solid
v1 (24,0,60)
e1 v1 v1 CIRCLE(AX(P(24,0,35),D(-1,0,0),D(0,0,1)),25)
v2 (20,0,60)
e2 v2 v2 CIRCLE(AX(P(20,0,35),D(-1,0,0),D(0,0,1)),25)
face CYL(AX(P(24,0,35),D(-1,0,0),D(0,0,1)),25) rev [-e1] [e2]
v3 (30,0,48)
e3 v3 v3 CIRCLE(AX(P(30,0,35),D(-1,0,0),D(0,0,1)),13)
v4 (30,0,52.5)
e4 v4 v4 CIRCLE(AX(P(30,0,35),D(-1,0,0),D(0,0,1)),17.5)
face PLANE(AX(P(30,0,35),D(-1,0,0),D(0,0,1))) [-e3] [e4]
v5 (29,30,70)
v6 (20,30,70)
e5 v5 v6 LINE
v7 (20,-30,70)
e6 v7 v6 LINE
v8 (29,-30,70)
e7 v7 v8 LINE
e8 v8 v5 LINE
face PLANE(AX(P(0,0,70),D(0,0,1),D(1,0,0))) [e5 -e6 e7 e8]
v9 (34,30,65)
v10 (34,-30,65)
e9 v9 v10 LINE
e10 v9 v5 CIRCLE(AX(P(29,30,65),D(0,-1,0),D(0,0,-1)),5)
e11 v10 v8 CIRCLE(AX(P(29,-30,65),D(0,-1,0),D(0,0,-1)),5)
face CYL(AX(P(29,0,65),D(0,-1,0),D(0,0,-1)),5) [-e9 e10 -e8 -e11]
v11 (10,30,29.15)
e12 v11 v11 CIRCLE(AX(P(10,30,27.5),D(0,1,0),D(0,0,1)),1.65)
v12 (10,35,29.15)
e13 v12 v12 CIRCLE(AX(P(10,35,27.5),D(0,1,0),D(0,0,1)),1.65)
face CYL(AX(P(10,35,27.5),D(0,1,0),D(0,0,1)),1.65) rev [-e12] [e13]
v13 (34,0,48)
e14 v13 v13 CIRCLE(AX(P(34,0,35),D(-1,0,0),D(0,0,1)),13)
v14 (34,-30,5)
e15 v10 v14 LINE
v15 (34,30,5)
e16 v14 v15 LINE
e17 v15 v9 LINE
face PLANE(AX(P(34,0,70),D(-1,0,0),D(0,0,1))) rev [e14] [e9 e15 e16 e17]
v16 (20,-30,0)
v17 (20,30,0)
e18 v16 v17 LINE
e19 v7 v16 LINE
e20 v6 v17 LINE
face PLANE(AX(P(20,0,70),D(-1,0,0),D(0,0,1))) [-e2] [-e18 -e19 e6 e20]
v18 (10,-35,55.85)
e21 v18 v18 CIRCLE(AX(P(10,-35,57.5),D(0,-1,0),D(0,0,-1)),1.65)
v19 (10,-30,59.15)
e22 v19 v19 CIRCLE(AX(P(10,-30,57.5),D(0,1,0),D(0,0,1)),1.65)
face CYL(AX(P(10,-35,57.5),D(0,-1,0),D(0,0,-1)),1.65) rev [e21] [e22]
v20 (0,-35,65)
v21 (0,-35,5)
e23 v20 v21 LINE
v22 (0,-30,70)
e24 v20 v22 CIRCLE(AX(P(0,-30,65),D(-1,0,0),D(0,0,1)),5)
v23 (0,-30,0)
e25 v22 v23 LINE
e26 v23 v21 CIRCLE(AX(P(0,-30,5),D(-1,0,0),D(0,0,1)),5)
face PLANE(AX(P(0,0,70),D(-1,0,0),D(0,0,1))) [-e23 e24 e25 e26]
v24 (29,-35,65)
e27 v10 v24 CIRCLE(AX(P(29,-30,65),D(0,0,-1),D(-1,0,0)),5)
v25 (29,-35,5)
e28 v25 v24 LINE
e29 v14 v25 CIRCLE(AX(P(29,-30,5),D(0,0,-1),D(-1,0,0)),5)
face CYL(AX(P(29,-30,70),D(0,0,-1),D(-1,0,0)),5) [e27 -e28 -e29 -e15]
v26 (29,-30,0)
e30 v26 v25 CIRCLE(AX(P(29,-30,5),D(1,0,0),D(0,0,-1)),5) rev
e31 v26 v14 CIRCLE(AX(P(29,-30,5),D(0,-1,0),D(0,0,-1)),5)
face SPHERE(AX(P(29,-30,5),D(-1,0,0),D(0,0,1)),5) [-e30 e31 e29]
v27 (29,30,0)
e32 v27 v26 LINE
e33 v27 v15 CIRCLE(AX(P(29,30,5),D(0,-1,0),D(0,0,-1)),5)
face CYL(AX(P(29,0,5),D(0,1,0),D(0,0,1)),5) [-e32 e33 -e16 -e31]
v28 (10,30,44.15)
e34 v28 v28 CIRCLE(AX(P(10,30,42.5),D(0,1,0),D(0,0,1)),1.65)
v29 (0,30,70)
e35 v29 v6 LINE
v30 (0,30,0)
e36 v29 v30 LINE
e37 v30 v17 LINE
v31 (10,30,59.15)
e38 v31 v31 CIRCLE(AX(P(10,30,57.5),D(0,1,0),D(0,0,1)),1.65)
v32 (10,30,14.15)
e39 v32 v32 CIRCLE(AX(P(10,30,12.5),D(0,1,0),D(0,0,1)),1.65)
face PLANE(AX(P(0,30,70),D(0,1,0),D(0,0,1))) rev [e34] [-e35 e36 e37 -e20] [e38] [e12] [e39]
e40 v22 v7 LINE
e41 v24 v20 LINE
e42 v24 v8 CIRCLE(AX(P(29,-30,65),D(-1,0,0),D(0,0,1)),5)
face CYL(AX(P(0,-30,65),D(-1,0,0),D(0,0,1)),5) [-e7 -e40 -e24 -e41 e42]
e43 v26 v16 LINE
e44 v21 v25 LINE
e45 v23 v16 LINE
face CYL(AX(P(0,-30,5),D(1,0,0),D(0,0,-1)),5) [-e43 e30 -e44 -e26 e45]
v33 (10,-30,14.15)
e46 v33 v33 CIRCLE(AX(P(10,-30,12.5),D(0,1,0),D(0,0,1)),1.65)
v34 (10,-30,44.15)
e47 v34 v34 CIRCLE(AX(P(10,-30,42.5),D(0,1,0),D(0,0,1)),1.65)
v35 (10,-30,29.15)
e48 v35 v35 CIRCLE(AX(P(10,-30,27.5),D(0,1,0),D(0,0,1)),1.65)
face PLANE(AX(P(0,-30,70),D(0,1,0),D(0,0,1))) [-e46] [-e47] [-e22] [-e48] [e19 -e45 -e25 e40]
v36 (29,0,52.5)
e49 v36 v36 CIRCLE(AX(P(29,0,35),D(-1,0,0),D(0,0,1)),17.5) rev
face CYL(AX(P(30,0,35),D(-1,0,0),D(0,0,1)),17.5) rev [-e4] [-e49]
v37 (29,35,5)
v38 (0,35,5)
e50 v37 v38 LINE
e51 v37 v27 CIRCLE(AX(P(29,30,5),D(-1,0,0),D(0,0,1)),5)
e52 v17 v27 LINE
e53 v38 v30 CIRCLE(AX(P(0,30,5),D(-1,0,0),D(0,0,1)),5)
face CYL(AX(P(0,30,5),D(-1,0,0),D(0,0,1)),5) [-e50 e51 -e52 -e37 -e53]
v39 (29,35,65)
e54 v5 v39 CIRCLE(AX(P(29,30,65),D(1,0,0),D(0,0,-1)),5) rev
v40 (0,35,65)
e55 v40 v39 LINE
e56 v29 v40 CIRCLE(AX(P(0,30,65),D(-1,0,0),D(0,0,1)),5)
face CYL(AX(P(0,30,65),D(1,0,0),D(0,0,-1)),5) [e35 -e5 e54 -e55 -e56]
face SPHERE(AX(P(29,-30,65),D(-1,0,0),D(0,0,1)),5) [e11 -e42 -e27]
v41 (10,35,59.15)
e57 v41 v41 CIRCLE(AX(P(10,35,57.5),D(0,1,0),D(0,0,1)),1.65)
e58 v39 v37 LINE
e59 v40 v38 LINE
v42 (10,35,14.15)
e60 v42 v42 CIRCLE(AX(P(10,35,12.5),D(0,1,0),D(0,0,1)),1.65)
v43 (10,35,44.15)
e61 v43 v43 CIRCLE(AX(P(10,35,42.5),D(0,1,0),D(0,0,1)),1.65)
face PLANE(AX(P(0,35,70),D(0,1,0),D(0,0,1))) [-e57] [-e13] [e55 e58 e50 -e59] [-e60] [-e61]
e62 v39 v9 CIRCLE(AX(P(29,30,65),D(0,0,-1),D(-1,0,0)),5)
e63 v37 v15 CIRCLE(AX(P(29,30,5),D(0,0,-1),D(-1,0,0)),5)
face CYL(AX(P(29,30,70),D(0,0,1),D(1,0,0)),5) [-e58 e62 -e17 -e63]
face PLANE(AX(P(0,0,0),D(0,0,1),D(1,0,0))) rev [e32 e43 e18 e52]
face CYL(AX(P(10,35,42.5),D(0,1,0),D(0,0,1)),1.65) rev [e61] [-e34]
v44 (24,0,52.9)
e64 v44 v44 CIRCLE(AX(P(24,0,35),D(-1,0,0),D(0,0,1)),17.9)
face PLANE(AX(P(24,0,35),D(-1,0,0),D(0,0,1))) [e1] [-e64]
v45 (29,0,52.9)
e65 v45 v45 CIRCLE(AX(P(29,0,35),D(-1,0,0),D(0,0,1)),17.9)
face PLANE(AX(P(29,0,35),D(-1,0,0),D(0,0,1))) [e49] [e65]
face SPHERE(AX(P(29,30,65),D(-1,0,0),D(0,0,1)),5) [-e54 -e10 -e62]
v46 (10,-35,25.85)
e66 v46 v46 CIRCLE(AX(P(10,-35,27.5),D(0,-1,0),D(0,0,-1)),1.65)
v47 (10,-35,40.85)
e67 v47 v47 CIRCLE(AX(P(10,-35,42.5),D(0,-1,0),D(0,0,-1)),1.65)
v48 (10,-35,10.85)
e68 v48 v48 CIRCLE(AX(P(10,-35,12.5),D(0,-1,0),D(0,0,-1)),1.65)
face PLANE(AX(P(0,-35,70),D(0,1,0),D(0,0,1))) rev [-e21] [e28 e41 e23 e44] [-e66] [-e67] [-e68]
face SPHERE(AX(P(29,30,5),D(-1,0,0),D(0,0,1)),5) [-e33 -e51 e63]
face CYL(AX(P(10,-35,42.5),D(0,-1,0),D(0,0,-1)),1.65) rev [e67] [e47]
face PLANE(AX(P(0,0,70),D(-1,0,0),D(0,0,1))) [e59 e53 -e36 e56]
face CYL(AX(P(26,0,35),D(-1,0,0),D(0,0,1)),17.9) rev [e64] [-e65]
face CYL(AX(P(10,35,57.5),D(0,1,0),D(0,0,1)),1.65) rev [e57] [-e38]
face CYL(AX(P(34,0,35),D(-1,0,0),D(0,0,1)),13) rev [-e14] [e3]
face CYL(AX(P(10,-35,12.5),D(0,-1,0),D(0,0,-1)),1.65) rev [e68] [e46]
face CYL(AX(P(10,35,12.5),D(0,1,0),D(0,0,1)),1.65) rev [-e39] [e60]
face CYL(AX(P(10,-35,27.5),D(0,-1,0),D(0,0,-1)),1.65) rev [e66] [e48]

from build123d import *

# Parameters (mm, degrees)
BOSS_EXTRUDE1_DEPTH       = 70
FILLET1_R                 = 5
FILLET2_R                 = 5
M4X0_7_TAPPED_HOLE1_D     = 3.3
M4X0_7_TAPPED_HOLE1_DEPTH = 5
SKETCH13_R                = 25
CUT_EXTRUDE1_DEPTH        = 4
SKETCH14_R                = 17.9
CUT_EXTRUDE2_DEPTH        = 2
SKETCH15_R                = 17.5
CUT_EXTRUDE3_DEPTH        = 4
SKETCH16_R                = 13
CUT_EXTRUDE4_DEPTH        = 84.815273071
SKETCH17_R                = 17.9
CUT_EXTRUDE5_DEPTH        = 3


with BuildPart() as part:
    # Sketch1 → Boss-Extrude1 (new body)
    with BuildSketch(Plane.XY):
        Polygon((0, -30), (0, -35), (34, -35), (34, 35), (0, 35), (0, 30), (20, 30), (20, -30), align=None)
    extrude(amount=BOSS_EXTRUDE1_DEPTH)

    # Fillet1
    fillet1_edges = [part.edges().sort_by_distance(p)[0] for p in [
        (17, -35, 70),
        (17, -35, 0),
        (17, 35, 0),
        (17, 35, 70),
    ]]
    fillet(fillet1_edges, radius=FILLET1_R - 0.0001)  # a hair under: the kernel refuses the full size

    # Fillet2
    fillet2_edges = [part.edges().sort_by_distance(p)[0] for p in [
        (34, 0, 70),
        (34, 0, 0),
        (34, 35, 35),
        (34, -35, 35),
        (34, 33.535563195, 68.535563195),
        (34, 33.535563195, 1.464436805),
        (34, -33.535563195, 1.464436805),
        (34, -33.535563195, 68.535563195),
    ]]
    fillet(fillet2_edges, radius=FILLET2_R - 0.0001)  # a hair under: the kernel refuses the full size

    # M4x0.7 Tapped Hole1
    with Locations(Plane(origin=(0, 35, 0), x_dir=(1, 0, 0), z_dir=(0, 1, 0))):
        with Locations((10, -12.5), (10, -27.5), (10, -42.5), (10, -57.5)):
            m4x0_7_tapped_hole1 = Hole(M4X0_7_TAPPED_HOLE1_D / 2, depth=M4X0_7_TAPPED_HOLE1_DEPTH)

    # Mirror1: M4x0.7 Tapped Hole1 across plane
    add(m4x0_7_tapped_hole1.mirror(Plane.ZX), mode=Mode.SUBTRACT)

    # Sketch13 → Cut-Extrude1 (cut)
    with BuildSketch(Plane.ZY.offset(-20)):
        with Locations((35, 0)):
            Circle(SKETCH13_R)
    extrude(amount=-CUT_EXTRUDE1_DEPTH, mode=Mode.SUBTRACT)

    # Sketch14 → Cut-Extrude2 (cut)
    with BuildSketch(Plane.ZY.offset(-24)):
        with Locations((35, 0)):
            Circle(SKETCH14_R)
    extrude(amount=-CUT_EXTRUDE2_DEPTH, mode=Mode.SUBTRACT)

    # Sketch15 → Cut-Extrude3 (cut)
    with BuildSketch(Plane.ZY.offset(-26)):
        with Locations((35, 0)):
            Circle(SKETCH15_R)
    extrude(amount=-CUT_EXTRUDE3_DEPTH, mode=Mode.SUBTRACT)

    # Sketch16 → Cut-Extrude4 (cut, through all)
    with BuildSketch(Plane.ZY.offset(-30)):
        with Locations((35, 0)):
            Circle(SKETCH16_R)
    extrude(amount=-CUT_EXTRUDE4_DEPTH, mode=Mode.SUBTRACT)

    # Sketch17 → Cut-Extrude5 (cut)
    with BuildSketch(Plane.ZY.offset(-26)):
        with Locations((35, 0)):
            Circle(SKETCH17_R)
    extrude(amount=-CUT_EXTRUDE5_DEPTH, mode=Mode.SUBTRACT)


solid = part.part
